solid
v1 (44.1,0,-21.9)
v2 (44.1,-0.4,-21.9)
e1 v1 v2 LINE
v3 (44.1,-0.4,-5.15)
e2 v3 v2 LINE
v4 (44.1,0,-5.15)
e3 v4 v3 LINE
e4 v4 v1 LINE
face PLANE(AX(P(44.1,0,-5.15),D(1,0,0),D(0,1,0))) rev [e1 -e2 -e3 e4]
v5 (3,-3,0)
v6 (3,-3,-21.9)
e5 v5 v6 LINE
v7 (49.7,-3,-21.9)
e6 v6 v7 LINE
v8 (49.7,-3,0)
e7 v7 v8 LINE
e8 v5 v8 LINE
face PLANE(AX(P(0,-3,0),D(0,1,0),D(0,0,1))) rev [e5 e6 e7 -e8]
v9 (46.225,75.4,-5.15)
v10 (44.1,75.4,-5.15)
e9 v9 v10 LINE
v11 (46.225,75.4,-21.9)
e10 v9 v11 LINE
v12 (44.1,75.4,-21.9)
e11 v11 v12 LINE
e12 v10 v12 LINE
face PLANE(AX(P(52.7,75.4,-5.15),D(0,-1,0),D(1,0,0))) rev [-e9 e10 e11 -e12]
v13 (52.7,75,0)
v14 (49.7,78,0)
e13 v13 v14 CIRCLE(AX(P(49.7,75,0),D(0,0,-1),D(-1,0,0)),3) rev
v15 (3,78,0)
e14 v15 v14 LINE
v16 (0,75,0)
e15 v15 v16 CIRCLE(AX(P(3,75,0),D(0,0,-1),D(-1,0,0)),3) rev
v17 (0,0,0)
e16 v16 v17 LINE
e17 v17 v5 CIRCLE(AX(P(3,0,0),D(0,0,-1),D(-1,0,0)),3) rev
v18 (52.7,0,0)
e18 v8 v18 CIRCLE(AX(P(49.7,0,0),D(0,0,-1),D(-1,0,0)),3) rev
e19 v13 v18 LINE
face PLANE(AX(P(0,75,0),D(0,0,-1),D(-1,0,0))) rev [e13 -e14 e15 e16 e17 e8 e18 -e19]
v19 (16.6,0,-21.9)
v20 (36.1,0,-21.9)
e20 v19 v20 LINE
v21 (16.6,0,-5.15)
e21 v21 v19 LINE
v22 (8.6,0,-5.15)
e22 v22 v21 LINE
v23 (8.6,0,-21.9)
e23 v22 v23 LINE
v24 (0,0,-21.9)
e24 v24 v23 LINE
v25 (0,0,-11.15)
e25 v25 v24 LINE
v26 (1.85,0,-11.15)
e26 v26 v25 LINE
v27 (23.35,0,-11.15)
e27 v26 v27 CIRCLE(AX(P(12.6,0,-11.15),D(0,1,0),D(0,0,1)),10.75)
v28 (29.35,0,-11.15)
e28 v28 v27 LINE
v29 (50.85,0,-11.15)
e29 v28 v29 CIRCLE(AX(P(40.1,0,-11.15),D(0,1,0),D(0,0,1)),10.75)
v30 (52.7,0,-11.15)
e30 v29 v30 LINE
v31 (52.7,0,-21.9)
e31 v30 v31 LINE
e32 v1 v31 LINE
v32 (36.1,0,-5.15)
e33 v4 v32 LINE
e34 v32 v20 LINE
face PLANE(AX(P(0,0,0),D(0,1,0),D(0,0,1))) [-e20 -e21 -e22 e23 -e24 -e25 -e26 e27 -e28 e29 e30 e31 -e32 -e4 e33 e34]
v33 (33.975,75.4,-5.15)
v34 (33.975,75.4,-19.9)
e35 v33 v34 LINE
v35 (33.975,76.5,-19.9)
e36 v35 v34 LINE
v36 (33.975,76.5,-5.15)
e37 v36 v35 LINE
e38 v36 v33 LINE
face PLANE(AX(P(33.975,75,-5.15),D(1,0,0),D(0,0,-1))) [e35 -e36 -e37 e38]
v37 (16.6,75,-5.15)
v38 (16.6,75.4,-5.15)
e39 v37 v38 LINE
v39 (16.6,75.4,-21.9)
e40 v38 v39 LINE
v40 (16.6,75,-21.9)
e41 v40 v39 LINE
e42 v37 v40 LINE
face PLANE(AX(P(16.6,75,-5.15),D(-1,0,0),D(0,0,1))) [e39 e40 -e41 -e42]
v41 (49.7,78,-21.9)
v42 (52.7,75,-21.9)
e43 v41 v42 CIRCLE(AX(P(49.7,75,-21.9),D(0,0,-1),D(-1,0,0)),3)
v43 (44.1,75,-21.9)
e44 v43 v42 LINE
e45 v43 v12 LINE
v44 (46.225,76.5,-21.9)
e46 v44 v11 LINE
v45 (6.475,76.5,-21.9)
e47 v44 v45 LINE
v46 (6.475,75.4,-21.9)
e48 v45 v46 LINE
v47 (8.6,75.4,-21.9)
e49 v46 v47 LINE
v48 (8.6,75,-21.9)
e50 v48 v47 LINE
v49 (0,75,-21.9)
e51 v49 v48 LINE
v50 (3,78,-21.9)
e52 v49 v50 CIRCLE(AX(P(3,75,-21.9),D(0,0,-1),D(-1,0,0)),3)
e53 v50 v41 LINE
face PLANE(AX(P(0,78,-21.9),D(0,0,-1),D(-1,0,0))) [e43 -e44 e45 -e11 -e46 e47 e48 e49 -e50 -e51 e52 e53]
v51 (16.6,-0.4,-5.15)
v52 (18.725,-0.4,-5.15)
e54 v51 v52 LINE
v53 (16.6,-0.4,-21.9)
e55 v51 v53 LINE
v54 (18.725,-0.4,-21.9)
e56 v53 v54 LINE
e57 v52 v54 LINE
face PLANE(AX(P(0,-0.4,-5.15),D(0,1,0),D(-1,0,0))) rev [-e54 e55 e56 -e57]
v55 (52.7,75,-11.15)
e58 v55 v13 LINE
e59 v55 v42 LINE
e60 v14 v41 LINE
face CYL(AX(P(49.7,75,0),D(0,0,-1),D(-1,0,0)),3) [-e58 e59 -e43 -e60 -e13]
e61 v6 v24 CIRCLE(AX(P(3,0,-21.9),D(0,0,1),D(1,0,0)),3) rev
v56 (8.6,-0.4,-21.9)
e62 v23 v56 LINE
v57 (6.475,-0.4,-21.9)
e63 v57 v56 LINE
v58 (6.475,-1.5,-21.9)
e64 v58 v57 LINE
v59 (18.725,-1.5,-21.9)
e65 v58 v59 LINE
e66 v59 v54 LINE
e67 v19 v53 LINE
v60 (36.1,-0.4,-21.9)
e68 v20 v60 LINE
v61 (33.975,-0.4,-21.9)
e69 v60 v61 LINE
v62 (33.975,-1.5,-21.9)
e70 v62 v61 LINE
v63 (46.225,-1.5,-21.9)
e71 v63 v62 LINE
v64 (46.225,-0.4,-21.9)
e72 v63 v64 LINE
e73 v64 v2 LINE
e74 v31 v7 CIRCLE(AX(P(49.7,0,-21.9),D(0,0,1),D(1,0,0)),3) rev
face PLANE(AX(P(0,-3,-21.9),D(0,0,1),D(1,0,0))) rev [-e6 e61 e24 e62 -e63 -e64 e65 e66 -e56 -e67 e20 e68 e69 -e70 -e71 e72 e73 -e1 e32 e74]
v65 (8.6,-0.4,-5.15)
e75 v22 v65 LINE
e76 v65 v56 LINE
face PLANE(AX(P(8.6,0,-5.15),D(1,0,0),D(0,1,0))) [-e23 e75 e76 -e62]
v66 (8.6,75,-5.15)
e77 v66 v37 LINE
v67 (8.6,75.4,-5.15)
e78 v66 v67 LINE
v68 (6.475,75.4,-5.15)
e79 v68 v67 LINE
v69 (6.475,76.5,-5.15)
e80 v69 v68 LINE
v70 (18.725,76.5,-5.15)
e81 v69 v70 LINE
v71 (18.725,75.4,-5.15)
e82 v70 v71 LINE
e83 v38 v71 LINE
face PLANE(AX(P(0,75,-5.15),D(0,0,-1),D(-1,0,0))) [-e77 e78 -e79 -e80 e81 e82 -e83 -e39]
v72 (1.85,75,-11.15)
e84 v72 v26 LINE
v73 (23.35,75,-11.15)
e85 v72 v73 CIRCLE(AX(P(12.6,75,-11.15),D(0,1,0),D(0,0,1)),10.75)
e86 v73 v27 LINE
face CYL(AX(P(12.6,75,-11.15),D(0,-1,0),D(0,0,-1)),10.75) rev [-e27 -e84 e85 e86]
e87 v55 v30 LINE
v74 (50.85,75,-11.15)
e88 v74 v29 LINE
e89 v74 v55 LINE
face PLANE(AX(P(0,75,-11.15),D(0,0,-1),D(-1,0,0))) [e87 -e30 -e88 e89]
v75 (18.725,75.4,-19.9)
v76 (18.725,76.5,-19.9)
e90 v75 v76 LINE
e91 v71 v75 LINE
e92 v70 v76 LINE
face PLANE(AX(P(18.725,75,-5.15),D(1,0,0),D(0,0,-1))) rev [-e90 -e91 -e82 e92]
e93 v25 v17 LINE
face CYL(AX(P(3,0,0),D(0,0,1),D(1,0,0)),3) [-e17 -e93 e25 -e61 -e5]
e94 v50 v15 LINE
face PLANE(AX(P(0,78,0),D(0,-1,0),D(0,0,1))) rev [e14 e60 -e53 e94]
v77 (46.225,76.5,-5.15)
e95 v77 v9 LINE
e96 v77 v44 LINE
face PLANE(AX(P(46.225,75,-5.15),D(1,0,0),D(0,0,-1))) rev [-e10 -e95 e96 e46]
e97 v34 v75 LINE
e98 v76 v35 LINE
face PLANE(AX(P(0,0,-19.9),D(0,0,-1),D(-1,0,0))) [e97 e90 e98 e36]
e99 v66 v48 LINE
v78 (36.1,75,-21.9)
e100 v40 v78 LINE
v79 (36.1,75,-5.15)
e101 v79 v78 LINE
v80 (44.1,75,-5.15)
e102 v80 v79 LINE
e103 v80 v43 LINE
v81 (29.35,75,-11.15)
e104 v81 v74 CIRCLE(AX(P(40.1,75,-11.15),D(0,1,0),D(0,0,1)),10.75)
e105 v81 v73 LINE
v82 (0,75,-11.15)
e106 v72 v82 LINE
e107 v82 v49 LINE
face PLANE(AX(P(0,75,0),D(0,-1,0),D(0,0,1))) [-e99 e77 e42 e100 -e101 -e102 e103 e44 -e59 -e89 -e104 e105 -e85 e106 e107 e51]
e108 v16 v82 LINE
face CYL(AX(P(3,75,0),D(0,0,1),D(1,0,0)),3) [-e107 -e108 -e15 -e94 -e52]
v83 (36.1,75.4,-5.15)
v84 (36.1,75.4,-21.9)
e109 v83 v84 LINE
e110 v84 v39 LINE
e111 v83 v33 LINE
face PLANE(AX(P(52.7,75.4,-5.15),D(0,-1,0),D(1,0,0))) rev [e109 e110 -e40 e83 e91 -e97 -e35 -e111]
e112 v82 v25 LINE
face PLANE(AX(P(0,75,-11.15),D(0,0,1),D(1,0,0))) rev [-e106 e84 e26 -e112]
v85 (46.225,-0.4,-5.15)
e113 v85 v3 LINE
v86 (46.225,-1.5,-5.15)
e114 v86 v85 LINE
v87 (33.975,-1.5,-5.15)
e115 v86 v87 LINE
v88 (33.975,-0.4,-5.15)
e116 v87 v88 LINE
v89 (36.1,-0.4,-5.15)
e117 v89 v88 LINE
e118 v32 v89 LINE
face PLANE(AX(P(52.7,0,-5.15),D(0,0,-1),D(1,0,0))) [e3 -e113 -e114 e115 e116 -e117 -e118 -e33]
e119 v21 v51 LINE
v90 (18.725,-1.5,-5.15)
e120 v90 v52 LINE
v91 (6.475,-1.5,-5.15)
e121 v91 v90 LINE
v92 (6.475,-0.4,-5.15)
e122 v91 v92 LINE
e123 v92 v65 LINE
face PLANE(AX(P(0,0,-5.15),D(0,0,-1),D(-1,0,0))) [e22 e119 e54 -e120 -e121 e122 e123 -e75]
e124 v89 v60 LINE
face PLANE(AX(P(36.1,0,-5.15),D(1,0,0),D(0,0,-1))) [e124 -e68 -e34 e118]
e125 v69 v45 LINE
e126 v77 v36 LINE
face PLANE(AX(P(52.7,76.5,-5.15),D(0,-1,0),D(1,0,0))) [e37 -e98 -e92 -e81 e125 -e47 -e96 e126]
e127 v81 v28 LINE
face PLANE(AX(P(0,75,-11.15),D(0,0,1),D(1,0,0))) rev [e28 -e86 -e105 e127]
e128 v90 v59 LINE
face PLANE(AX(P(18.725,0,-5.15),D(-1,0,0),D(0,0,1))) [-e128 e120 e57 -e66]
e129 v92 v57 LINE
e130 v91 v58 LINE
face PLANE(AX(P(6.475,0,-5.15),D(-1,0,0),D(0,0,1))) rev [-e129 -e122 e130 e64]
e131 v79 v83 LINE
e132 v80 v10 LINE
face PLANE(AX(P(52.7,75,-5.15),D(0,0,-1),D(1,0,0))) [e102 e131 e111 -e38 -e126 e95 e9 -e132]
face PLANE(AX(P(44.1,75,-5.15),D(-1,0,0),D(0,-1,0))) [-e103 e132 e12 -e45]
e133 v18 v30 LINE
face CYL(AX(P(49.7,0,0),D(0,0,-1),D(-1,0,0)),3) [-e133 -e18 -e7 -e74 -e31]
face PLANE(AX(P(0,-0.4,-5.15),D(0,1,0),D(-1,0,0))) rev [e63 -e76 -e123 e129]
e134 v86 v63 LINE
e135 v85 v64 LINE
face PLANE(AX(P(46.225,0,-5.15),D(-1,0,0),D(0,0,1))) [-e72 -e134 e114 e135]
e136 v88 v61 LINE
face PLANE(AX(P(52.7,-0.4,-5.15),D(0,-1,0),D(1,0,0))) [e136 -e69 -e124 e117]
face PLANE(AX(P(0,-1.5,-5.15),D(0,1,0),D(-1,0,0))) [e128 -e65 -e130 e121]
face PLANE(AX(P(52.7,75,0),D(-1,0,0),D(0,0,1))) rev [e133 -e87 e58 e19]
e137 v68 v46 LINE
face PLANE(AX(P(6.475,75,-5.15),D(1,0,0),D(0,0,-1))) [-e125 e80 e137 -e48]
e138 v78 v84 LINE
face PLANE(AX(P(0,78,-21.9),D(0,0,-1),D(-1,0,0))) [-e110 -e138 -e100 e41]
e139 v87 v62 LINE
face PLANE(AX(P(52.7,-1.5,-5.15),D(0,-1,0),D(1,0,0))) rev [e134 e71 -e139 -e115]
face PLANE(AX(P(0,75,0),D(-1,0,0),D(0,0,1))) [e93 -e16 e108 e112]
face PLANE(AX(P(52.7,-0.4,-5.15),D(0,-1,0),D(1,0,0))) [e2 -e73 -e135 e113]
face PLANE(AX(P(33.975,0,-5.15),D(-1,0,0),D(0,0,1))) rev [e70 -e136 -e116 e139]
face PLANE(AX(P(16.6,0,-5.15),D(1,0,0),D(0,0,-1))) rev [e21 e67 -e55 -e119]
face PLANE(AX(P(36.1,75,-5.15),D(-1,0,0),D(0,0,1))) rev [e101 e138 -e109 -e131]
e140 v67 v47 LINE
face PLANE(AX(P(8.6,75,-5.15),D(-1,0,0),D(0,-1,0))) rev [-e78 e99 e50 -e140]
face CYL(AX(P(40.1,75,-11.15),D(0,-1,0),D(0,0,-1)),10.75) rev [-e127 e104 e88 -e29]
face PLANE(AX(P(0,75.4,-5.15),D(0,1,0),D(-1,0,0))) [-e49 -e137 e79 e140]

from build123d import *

# Parameters (mm, degrees)
BOSS_EXTRUDE1_DEPTH  = 75
BOSS_EXTRUDE2_START  = -3
SKETCH1_3_R          = 10.75
BOSS_EXTRUDE2_DEPTH  = 3
CUT_EXTRUDE1_DEPTH   = 16.75
MIRROR3_COPY_1_DEPTH = 16.75
SKETCH5_W            = 15.25
SKETCH5_H            = 1.1
CUT_EXTRUDE2_DEPTH   = 2
FILLET1_R            = 3


with BuildPart() as part:
    # Sketch1 → Boss-Extrude1 (new body)
    with BuildSketch(Plane(origin=(0, 0, 0), x_dir=(1, 0, 0), z_dir=(0, 1, 0))):
        with BuildLine():
            Line((0, 0), (12.6, 0))
            Line((12.6, 0), (12.6, 0.4))
            ThreePointArc((12.6, 0.4), (4.998602102, 3.548602102), (1.85, 11.15))
            Line((1.85, 11.15), (0, 11.15))
            Line((0, 11.15), (0, 0))
        make_face()
        with BuildLine():
            Line((12.6, 0), (26.35, 0))
            Line((26.35, 0), (26.35, 11.15))
            Line((26.35, 11.15), (23.35, 11.15))
            ThreePointArc((23.35, 11.15), (20.201397898, 3.548602102), (12.6, 0.4))
            Line((12.6, 0.4), (12.6, 0))
        make_face()
        with BuildLine():
            Line((26.35, 11.15), (26.35, 0))
            Line((26.35, 0), (52.7, 0))
            Line((52.7, 0), (52.7, 11.15))
            Line((52.7, 11.15), (50.85, 11.15))
            ThreePointArc((50.85, 11.15), (40.1, 0.4), (29.35, 11.15))
            Line((29.35, 11.15), (26.35, 11.15))
        make_face()
    extrude(amount=BOSS_EXTRUDE1_DEPTH)

    # Sketch1<3> → Boss-Extrude2 (add)
    with BuildSketch(Plane(origin=(0, 0, 0), x_dir=(1, 0, 0), z_dir=(0, 1, 0)).offset(BOSS_EXTRUDE2_START)):
        with BuildLine():
            Line((50.85, 11.15), (52.7, 11.15))
            Line((52.7, 11.15), (52.7, 21.9))
            Line((52.7, 21.9), (40.1, 21.9))
            ThreePointArc((40.1, 21.9), (47.701397898, 18.751397898), (50.85, 11.15))
        make_face()
        with BuildLine():
            Line((26.35, 11.15), (26.35, 0))
            Line((26.35, 0), (52.7, 0))
            Line((52.7, 0), (52.7, 11.15))
            Line((52.7, 11.15), (50.85, 11.15))
            ThreePointArc((50.85, 11.15), (40.1, 0.4), (29.35, 11.15))
            Line((29.35, 11.15), (26.35, 11.15))
        make_face()
        with Locations((40.1, 11.15)):
            Circle(SKETCH1_3_R)
        with BuildLine():
            Line((23.35, 11.15), (26.35, 11.15))
            Line((26.35, 11.15), (29.35, 11.15))
            ThreePointArc((29.35, 11.15), (32.498602102, 18.751397898), (40.1, 21.9))
            Line((40.1, 21.9), (12.6, 21.9))
            ThreePointArc((12.6, 21.9), (20.201397898, 18.751397898), (23.35, 11.15))
        make_face()
        with BuildLine():
            Line((12.6, 0), (26.35, 0))
            Line((26.35, 0), (26.35, 11.15))
            Line((26.35, 11.15), (23.35, 11.15))
            ThreePointArc((23.35, 11.15), (20.201397898, 3.548602102), (12.6, 0.4))
            Line((12.6, 0.4), (12.6, 0))
        make_face()
        with Locations((12.6, 11.15)):
            Circle(SKETCH1_3_R)
        with BuildLine():
            Line((0, 0), (12.6, 0))
            Line((12.6, 0), (12.6, 0.4))
            ThreePointArc((12.6, 0.4), (4.998602102, 3.548602102), (1.85, 11.15))
            Line((1.85, 11.15), (0, 11.15))
            Line((0, 11.15), (0, 0))
        make_face()
        with BuildLine():
            ThreePointArc((1.85, 11.15), (4.998602102, 18.751397898), (12.6, 21.9))
            Line((12.6, 21.9), (0, 21.9))
            Line((0, 21.9), (0, 11.15))
            Line((0, 11.15), (1.85, 11.15))
        make_face()
    boss_extrude2 = extrude(amount=BOSS_EXTRUDE2_DEPTH)

    # Sketch4 → Cut-Extrude1 (cut)
    with BuildSketch(Plane(origin=(0, 0, -21.9), x_dir=(-1, 0, 0), z_dir=(0, 0, -1))):
        Polygon((-18.725, -1.5), (-6.475, -1.5), (-6.475, -0.4), (-8.6, -0.4), (-8.6, 0), (-16.6, 0), (-16.6, -0.4), (-18.725, -0.4), align=None)
    cut_extrude1 = extrude(amount=-CUT_EXTRUDE1_DEPTH, mode=Mode.SUBTRACT)

    # Mirror2: Cut-Extrude1 across plane
    add(cut_extrude1.mirror(Plane(origin=(26.35, 0, 0), x_dir=(0, 0, 1), z_dir=(1, 0, 0))), mode=Mode.SUBTRACT)

    # Mirror3: Boss-Extrude2, Cut-Extrude1 across plane
    add(boss_extrude2.mirror(Plane.ZX.offset(37.5)))
    add(cut_extrude1.mirror(Plane.ZX.offset(37.5)), mode=Mode.SUBTRACT)

    # Mirror3 copy 1 sketch → Mirror3 copy 1 (cut)
    with BuildSketch(Plane(origin=(52.7, 75, -21.9), x_dir=(1, 0, 0), z_dir=(0, 0, -1))):
        Polygon((-18.725, -1.5), (-6.475, -1.5), (-6.475, -0.4), (-8.6, -0.4), (-8.6, 0), (-16.6, 0), (-16.6, -0.4), (-18.725, -0.4), align=None)
    extrude(amount=-MIRROR3_COPY_1_DEPTH, mode=Mode.SUBTRACT)

    # Sketch5 → Cut-Extrude2 (cut)
    with BuildSketch(Plane(origin=(0, 0, -21.9), x_dir=(-1, 0, 0), z_dir=(0, 0, -1))):
        with Locations((-26.35, 75.95)):
            Rectangle(SKETCH5_W, SKETCH5_H)
    extrude(amount=-CUT_EXTRUDE2_DEPTH, mode=Mode.SUBTRACT)

    # Fillet1
    fillet1_edges = [part.edges().sort_by_distance(p)[0] for p in [
        (0, 78, -10.95),
        (52.7, 78, -10.95),
        (52.7, -3, -10.95),
        (0, -3, -10.95),
    ]]
    fillet(fillet1_edges, radius=FILLET1_R - 0.0001)  # a hair under: the kernel refuses the full size


solid = part.part
